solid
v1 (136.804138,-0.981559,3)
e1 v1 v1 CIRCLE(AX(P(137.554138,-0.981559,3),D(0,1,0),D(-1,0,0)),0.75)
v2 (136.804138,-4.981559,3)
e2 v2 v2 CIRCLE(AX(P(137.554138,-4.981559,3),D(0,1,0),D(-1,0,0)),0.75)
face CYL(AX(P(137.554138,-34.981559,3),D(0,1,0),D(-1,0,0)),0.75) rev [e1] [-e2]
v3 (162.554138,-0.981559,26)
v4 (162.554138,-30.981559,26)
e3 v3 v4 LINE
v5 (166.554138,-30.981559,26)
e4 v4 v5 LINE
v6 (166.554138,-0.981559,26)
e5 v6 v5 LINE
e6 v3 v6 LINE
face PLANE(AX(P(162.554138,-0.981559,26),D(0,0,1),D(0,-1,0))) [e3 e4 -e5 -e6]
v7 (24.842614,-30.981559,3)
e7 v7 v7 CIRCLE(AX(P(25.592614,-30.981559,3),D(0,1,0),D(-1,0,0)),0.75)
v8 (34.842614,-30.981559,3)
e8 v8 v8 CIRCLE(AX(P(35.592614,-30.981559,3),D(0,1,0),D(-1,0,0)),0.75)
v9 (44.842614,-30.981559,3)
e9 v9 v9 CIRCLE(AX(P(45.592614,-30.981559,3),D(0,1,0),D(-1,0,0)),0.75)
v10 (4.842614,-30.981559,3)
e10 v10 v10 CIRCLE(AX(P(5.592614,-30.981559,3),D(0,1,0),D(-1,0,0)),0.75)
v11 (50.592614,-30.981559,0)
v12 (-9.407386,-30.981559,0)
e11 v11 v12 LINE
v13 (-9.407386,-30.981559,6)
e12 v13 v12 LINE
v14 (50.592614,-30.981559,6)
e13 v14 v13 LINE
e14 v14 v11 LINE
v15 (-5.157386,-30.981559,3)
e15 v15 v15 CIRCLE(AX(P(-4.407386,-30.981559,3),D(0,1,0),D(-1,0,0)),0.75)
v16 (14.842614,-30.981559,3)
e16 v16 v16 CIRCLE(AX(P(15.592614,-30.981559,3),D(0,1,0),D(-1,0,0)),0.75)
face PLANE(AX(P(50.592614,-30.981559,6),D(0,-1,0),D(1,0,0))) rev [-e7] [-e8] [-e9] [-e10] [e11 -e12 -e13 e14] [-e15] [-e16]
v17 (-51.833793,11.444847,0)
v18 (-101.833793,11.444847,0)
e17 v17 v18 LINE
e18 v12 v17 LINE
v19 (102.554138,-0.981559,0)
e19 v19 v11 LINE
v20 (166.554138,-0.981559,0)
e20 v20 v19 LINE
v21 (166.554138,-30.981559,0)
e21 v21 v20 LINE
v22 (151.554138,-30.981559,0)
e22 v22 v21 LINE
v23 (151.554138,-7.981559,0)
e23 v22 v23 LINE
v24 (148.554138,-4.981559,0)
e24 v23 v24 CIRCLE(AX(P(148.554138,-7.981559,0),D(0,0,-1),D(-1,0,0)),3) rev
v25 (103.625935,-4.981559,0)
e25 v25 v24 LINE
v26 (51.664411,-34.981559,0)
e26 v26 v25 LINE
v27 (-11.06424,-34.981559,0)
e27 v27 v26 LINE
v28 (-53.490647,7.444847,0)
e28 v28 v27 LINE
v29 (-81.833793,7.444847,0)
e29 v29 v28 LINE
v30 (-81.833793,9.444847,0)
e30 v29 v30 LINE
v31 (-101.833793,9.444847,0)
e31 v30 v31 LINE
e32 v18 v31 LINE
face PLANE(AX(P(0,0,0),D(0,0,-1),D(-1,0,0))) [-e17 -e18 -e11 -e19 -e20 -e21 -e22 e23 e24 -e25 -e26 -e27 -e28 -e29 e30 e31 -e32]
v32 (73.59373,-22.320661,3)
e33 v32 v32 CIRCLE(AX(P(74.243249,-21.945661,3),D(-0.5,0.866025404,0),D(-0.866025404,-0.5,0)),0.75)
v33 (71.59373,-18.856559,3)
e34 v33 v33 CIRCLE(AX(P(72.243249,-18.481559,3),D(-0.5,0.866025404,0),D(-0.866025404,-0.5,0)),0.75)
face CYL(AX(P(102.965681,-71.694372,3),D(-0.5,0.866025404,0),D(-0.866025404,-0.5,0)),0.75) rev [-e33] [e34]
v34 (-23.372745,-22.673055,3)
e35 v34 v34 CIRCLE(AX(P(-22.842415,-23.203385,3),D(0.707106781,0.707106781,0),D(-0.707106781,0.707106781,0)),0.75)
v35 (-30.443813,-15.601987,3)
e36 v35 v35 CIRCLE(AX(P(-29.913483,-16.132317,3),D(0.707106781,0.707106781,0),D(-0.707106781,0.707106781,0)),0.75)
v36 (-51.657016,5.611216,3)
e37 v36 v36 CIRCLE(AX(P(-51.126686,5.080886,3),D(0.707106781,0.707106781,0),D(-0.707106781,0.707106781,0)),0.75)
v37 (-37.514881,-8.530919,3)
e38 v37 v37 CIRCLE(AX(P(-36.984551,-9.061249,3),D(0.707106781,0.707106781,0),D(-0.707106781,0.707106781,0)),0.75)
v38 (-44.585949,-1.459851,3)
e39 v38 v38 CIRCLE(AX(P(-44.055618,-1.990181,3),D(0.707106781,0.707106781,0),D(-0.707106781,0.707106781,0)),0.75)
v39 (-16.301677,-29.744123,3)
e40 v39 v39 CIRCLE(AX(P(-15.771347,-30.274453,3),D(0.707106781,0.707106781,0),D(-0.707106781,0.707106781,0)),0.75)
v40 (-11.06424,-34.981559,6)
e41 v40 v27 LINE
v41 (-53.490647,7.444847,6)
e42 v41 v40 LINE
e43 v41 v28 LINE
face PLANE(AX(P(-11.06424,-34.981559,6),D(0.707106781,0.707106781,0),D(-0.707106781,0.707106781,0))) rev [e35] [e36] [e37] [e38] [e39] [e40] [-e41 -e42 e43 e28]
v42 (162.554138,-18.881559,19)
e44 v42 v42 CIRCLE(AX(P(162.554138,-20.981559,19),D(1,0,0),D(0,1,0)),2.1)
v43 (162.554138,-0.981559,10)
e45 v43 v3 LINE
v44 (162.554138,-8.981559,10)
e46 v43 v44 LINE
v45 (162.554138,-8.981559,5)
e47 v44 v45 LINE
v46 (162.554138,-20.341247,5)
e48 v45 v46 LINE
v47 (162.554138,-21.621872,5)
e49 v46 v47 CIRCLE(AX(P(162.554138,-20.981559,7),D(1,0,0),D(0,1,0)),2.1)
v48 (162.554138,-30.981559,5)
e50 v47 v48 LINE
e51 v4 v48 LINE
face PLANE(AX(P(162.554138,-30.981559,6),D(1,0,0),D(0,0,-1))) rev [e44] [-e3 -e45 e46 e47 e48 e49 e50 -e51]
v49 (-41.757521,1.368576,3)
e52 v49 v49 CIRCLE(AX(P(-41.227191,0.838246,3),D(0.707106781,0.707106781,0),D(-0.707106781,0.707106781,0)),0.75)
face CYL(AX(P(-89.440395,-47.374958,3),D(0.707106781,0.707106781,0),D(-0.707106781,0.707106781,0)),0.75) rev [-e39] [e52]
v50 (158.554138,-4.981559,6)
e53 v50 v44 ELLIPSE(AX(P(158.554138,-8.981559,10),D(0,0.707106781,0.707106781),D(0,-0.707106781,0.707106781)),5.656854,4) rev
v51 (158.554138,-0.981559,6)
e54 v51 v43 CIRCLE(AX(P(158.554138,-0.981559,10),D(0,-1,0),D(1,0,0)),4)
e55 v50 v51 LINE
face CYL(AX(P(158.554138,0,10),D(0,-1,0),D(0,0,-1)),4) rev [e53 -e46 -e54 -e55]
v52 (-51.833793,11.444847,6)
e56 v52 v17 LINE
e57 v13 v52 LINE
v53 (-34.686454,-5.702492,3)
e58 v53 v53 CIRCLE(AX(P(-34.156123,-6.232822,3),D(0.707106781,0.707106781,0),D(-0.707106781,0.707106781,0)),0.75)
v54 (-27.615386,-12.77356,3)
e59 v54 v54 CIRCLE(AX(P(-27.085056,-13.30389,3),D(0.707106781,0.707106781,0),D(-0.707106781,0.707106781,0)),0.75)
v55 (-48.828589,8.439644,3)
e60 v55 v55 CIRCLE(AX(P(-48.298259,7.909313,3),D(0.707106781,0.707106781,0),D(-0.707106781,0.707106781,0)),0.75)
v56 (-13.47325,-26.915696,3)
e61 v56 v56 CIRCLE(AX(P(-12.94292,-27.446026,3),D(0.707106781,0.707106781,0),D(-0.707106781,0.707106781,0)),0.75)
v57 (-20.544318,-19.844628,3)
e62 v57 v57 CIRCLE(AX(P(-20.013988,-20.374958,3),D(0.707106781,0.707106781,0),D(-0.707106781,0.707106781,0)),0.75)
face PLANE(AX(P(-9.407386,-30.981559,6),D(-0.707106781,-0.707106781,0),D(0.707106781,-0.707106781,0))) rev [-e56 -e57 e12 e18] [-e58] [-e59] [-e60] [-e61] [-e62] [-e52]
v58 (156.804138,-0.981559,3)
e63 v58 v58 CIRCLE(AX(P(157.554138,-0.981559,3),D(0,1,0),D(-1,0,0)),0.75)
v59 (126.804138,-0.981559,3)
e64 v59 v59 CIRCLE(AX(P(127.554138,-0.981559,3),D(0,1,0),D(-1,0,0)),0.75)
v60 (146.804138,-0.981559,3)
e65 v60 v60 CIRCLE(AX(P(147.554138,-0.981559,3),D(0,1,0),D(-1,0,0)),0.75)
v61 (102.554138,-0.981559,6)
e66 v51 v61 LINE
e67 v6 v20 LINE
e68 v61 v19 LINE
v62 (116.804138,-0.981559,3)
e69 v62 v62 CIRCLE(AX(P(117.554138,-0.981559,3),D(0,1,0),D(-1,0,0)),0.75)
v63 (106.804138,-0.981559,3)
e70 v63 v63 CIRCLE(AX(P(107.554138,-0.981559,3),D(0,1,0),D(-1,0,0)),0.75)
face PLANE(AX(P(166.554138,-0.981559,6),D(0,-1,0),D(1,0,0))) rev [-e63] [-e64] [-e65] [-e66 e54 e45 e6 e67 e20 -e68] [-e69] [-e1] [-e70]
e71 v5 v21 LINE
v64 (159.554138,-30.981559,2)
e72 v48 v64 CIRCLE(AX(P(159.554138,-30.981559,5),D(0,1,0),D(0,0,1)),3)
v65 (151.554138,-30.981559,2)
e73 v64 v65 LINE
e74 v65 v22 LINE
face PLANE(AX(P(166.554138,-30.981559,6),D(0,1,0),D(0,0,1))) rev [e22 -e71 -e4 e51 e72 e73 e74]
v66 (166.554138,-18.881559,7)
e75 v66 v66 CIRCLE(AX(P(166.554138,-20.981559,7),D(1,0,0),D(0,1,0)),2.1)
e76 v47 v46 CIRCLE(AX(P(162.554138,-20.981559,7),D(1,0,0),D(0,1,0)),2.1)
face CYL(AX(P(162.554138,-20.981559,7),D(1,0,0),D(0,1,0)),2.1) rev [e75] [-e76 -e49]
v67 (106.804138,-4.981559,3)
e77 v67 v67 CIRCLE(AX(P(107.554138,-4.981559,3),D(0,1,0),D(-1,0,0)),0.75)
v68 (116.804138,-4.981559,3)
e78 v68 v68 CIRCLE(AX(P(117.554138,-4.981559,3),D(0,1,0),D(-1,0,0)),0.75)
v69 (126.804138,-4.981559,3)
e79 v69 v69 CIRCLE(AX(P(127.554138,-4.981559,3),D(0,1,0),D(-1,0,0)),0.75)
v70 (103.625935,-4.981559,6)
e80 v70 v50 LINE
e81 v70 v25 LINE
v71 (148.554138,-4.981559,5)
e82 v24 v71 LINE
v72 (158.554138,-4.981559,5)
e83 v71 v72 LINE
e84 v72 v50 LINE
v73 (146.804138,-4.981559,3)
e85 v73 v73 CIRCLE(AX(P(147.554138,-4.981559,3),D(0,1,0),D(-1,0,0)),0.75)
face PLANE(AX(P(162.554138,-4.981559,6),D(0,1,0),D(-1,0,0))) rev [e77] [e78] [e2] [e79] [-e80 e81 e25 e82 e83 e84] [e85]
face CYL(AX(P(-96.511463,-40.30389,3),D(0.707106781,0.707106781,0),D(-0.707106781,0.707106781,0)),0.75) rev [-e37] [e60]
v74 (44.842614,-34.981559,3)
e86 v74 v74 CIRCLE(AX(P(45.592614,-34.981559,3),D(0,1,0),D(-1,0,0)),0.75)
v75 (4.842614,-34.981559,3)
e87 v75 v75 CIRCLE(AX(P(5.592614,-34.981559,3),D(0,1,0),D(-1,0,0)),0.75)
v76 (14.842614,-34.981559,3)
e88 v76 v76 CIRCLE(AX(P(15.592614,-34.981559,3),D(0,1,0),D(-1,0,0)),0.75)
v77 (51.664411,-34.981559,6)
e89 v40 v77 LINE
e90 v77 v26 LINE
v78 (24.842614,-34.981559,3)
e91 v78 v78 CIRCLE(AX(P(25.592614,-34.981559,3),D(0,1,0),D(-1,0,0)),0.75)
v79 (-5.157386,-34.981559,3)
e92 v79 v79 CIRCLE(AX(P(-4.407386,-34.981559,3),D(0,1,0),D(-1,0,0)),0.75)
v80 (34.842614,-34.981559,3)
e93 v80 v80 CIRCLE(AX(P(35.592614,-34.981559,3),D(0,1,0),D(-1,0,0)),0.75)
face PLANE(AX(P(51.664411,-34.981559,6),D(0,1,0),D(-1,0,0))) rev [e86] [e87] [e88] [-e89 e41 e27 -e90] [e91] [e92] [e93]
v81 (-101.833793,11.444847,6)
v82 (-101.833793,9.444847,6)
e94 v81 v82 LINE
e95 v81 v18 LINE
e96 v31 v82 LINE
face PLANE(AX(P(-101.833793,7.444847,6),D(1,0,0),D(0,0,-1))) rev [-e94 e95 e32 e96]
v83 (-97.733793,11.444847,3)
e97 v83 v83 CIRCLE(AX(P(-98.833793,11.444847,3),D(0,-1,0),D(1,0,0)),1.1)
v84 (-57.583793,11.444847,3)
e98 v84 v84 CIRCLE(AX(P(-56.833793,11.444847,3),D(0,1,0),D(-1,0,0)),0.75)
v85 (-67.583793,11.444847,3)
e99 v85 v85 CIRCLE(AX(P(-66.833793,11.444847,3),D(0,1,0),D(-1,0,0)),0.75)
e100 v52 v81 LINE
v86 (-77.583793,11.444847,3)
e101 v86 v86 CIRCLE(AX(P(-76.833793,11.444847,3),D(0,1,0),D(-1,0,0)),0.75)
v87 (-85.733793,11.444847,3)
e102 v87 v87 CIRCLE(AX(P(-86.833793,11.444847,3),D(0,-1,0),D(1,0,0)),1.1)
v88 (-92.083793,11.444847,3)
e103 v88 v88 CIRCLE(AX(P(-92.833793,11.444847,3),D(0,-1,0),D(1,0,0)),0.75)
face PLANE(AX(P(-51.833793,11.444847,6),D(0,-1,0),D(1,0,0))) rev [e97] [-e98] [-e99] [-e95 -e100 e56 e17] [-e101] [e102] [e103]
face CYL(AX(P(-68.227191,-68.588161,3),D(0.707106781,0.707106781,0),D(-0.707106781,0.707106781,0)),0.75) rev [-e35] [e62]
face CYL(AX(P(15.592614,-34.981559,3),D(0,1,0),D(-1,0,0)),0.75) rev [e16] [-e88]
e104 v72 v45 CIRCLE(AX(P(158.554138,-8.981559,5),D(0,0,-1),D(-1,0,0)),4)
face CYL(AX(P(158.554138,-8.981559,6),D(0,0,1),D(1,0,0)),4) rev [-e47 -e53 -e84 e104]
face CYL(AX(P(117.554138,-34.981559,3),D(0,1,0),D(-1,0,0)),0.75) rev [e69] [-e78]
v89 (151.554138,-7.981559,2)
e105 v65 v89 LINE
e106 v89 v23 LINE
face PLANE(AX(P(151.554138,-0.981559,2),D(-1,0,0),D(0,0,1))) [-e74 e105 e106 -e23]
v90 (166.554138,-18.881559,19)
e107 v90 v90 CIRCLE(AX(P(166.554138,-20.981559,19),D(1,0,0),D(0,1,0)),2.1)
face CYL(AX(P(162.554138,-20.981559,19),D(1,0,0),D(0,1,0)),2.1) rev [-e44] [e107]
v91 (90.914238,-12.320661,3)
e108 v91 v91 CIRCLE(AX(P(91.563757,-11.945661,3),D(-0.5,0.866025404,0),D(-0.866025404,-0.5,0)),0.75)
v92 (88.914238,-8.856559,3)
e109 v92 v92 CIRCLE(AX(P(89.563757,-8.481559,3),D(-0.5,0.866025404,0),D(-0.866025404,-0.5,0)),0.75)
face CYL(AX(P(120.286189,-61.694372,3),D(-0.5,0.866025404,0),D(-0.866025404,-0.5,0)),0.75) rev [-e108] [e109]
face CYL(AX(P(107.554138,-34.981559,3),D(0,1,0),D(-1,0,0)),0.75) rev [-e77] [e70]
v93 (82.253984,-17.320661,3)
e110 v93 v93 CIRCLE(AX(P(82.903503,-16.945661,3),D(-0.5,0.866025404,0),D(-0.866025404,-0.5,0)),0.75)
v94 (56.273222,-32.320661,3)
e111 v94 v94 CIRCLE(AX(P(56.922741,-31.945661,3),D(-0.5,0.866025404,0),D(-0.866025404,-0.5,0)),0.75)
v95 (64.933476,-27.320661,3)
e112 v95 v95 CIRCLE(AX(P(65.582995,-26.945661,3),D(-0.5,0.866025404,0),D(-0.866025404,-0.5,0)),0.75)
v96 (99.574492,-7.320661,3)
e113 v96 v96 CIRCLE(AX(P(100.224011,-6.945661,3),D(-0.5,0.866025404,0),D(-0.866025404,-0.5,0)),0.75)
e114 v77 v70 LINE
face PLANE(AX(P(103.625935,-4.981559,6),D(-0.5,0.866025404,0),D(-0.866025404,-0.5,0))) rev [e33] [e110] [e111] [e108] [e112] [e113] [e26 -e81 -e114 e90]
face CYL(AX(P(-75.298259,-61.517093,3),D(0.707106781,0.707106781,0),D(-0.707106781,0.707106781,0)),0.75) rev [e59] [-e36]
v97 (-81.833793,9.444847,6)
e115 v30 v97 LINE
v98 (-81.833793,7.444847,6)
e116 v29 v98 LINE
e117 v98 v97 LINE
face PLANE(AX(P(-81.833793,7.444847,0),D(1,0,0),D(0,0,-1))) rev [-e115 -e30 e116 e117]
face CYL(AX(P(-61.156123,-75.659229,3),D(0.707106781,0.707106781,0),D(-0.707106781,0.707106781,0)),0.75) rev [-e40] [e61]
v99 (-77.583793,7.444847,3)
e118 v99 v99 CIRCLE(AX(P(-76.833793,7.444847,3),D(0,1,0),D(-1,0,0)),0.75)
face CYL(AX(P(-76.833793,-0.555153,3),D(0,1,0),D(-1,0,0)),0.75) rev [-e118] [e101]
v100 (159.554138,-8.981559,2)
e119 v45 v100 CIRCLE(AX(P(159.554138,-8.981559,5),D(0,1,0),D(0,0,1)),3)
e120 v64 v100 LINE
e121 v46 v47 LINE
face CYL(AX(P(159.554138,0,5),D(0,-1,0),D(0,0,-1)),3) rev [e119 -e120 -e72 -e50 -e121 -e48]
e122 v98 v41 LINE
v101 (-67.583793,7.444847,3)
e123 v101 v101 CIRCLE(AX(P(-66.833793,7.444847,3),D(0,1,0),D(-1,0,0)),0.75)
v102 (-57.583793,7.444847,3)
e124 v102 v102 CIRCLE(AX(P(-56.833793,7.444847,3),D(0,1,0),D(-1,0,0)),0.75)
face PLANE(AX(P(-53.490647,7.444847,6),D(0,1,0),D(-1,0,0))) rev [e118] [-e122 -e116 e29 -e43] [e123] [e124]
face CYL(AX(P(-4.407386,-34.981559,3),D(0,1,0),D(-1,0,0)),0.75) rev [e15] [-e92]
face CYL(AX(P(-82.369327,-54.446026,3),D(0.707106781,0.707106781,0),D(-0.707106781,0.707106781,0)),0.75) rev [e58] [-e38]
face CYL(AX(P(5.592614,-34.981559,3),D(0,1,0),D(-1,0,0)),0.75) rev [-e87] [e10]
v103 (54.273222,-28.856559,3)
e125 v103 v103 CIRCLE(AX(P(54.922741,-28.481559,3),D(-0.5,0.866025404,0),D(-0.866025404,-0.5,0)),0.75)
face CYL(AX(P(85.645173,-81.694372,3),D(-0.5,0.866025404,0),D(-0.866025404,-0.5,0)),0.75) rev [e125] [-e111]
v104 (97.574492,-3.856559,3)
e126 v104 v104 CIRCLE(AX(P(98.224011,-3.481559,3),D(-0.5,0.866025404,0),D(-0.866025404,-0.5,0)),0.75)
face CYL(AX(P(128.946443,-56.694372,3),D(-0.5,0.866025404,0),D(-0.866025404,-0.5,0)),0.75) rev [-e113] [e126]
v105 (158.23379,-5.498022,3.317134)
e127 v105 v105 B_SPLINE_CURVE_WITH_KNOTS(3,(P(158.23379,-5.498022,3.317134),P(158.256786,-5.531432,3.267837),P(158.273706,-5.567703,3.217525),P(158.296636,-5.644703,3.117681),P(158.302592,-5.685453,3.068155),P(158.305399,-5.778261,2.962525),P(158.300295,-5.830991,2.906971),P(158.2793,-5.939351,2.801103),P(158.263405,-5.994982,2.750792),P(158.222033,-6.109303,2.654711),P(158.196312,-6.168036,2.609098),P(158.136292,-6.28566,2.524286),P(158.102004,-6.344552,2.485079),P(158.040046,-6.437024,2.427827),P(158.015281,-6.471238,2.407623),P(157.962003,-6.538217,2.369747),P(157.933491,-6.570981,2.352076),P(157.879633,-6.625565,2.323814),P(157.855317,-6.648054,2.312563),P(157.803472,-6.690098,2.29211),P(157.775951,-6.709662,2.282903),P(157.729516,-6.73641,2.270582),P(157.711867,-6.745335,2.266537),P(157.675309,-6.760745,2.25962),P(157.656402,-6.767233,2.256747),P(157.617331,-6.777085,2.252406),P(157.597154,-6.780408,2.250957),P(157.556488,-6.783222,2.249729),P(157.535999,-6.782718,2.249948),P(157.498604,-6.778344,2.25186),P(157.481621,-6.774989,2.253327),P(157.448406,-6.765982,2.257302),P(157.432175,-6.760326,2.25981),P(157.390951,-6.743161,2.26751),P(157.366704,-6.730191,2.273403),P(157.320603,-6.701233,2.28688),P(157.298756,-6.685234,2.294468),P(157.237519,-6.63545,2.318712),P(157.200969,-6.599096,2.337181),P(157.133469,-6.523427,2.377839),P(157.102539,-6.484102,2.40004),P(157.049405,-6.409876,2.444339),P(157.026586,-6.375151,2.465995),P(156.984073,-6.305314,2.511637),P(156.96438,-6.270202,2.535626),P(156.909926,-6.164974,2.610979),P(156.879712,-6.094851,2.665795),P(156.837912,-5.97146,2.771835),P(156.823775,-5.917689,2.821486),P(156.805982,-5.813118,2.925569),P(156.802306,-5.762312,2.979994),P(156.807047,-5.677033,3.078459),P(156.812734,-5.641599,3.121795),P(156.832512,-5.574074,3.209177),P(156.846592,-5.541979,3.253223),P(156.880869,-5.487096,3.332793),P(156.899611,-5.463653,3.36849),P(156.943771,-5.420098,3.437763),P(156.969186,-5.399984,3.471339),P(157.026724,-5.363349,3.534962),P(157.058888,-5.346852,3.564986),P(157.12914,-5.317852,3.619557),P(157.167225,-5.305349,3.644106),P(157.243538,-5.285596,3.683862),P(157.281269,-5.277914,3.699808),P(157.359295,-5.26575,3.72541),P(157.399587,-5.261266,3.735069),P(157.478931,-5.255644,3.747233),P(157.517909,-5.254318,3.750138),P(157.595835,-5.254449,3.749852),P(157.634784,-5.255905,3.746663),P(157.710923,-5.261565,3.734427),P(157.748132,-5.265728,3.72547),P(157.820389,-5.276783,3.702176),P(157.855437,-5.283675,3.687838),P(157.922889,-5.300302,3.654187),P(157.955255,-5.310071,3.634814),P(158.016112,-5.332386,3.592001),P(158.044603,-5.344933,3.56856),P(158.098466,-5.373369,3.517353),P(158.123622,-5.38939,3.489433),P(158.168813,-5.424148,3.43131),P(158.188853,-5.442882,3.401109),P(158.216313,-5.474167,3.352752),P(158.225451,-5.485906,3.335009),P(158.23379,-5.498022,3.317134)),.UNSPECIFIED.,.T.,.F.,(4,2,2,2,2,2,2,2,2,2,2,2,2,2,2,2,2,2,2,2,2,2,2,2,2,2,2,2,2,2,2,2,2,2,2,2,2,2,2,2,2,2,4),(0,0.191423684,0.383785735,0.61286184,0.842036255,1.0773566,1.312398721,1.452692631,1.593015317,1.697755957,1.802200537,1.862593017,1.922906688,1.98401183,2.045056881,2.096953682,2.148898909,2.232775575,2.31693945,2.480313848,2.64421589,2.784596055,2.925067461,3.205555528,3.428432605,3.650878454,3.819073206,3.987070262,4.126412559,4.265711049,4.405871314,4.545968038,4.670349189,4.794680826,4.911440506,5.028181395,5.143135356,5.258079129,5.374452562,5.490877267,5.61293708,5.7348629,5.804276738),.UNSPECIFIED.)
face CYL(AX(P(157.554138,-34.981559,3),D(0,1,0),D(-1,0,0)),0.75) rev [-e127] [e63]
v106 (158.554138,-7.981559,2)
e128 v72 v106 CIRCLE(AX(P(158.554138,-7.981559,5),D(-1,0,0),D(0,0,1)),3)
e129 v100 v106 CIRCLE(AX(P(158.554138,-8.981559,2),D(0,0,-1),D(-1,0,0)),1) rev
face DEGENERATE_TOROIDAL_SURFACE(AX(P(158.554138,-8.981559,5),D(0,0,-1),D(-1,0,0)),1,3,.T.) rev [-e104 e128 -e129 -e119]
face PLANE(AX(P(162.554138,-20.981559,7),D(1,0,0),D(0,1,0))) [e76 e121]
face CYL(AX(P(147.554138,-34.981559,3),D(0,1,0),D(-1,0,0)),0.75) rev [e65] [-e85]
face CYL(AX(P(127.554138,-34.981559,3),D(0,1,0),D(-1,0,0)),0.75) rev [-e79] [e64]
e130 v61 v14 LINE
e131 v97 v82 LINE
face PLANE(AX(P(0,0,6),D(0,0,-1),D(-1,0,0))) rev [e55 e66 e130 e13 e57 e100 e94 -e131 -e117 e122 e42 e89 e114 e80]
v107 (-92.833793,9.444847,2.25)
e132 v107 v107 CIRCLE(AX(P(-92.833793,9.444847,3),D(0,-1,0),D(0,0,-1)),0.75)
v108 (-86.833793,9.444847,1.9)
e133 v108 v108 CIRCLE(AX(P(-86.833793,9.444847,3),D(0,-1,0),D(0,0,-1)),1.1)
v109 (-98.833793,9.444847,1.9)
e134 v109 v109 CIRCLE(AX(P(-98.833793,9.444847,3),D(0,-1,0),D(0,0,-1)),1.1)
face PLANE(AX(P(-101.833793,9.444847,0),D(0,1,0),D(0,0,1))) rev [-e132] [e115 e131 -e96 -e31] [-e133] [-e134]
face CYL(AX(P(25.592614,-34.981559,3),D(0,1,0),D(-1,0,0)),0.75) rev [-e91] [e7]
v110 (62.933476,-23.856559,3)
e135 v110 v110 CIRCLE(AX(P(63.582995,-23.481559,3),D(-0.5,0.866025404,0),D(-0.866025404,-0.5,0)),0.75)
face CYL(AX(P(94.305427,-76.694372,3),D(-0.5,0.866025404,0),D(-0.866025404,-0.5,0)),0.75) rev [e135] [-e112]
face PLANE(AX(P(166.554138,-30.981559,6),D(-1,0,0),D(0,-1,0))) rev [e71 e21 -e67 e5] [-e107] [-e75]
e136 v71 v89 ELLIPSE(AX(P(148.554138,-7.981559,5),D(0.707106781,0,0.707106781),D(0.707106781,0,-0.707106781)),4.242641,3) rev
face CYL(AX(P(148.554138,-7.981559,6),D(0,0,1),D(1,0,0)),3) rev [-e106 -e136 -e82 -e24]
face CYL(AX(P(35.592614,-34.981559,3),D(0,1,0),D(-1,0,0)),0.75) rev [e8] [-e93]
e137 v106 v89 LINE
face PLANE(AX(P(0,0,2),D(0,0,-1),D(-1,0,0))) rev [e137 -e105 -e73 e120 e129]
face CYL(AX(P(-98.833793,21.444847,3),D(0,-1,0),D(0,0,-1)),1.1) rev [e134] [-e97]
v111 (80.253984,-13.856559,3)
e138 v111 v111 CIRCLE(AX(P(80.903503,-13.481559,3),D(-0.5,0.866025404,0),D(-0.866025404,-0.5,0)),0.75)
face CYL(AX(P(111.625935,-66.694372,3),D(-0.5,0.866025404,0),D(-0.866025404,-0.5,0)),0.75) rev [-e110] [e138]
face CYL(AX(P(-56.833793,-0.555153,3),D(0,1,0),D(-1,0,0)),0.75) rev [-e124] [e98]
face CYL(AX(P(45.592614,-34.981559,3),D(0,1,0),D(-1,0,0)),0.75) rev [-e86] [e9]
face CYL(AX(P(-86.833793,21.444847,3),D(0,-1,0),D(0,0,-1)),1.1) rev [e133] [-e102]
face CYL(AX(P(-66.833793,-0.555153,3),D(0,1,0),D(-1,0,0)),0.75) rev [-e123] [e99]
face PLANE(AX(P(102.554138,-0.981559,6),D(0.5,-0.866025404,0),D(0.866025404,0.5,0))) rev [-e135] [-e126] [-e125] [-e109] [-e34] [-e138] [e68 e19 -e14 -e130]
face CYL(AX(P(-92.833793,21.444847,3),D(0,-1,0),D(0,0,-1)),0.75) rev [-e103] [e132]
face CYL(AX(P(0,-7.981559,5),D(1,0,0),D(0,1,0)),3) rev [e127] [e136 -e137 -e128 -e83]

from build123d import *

# Parameters (mm, degrees)
BOSS_EXTRUDE1_DEPTH = 6
SKETCH3_W           = 20
SKETCH3_H           = 2
CUT_EXTRUDE1_DEPTH  = 6
SKETCH4_R           = 0.75
CUT_EXTRUDE2_DEPTH  = 171.094917366
SKETCH5_R           = 0.75
CUT_EXTRUDE3_DEPTH  = 152.577812455
SKETCH6_R           = 0.75
CUT_EXTRUDE4_DEPTH  = 172.977559331
SKETCH7_R           = 0.75
CUT_EXTRUDE5_DEPTH  = 190.504855499
SKETCH9_R           = 0.75
CUT_EXTRUDE6_DEPTH  = 12
SKETCH10_R          = 1.1
CUT_EXTRUDE7_DEPTH  = 12
SKETCH11_R          = 1.1
CUT_EXTRUDE8_DEPTH  = 12
SKETCH12_R          = 0.75
CUT_EXTRUDE9_DEPTH  = 12
SKETCH15_W          = 20
SKETCH15_H          = 30
BOSS_EXTRUDE4_DEPTH = 4
FILLET4_R           = 4
SKETCH16_W          = 15
SKETCH16_H          = 30
BOSS_EXTRUDE5_DEPTH = 2
FILLET5_R           = 3
FILLET6_DEPTH       = 1.9999999
FILLET6_START       = 148.554137986
FILLET6_2_DEPTH     = 3.0000001
FILLET6_START_2     = 1.99999999
FILLET6_3_DEPTH     = 3.00000001
SKETCH17_R          = 2.1
CUT_EXTRUDE12_DEPTH = 4


with BuildPart() as part:
    # Sketch1 → Boss-Extrude1 (new body)
    with BuildSketch(Plane.XY):
        Polygon((166.554138086, -30.981559499), (166.554138086, -0.981559499), (102.554138086, -0.981559499), (50.592613859, -30.981559499), (-9.407386141, -30.981559499), (-51.833793012, 11.444847372), (-101.833793012, 11.444847372), (-101.833793012, 7.444847372), (-53.490647262, 7.444847372), (-11.06424039, -34.981559499), (51.664410629, -34.981559499), (103.625934856, -4.981559499), (162.554138086, -4.981559499), (162.554138086, -30.981559499), align=None)
    extrude(amount=BOSS_EXTRUDE1_DEPTH)

    # Sketch3 → Cut-Extrude1 (cut)
    with BuildSketch(Plane.XY.offset(6)):
        with Locations((-91.833793012, 8.444847372)):
            Rectangle(SKETCH3_W, SKETCH3_H)
    extrude(amount=-CUT_EXTRUDE1_DEPTH, mode=Mode.SUBTRACT)

    # Sketch4 → Cut-Extrude2 (cut, through all)
    with BuildSketch(Plane(origin=(0, -0.981559499, 0), x_dir=(1, 0, 0), z_dir=(0, 1, 0))):
        with Locations(Location((107.554138086, -3, 0), (0, 0, 180))):
            Circle(SKETCH4_R)
        with Locations(Location((117.554138086, -3, 0), (0, 0, 180))):
            Circle(SKETCH4_R)
        with Locations(Location((127.554138086, -3, 0), (0, 0, 180))):
            Circle(SKETCH4_R)
        with Locations(Location((137.554138086, -3, 0), (0, 0, 180))):
            Circle(SKETCH4_R)
        with Locations(Location((147.554138086, -3, 0), (0, 0, 180))):
            Circle(SKETCH4_R)
        with Locations(Location((157.554138086, -3, 0), (0, 0, 180))):
            Circle(SKETCH4_R)
    extrude(amount=-CUT_EXTRUDE2_DEPTH, mode=Mode.SUBTRACT)

    # Sketch5 → Cut-Extrude3 (cut, through all)
    with BuildSketch(Plane(origin=(26.063562252, -45.143414047, 0), x_dir=(0.8660254037844379, 0.5000000000000013, 0), z_dir=(-0.5000000000000013, 0.8660254037844379, 0))):
        with Locations(Location((33.323709096, -3, 0), (0, 0, 180))):
            Circle(SKETCH5_R)
        with Locations(Location((43.323709096, -3, 0), (0, 0, 180))):
            Circle(SKETCH5_R)
        with Locations(Location((53.323709096, -3, 0), (0, 0, 180))):
            Circle(SKETCH5_R)
        with Locations(Location((63.323709096, -3, 0), (0, 0, 180))):
            Circle(SKETCH5_R)
        with Locations(Location((73.323709096, -3, 0), (0, 0, 180))):
            Circle(SKETCH5_R)
        with Locations(Location((83.323709096, -3, 0), (0, 0, 180))):
            Circle(SKETCH5_R)
    extrude(amount=-CUT_EXTRUDE3_DEPTH, mode=Mode.SUBTRACT)

    # Sketch6 → Cut-Extrude4 (cut, through all)
    with BuildSketch(Plane(origin=(0, -30.981559499, 0), x_dir=(1, 0, 0), z_dir=(0, 1, 0))):
        with Locations(Location((45.592613859, -3, 0), (0, 0, 180))):
            Circle(SKETCH6_R)
        with Locations(Location((35.592613859, -3, 0), (0, 0, 180))):
            Circle(SKETCH6_R)
        with Locations(Location((25.592613859, -3, 0), (0, 0, 180))):
            Circle(SKETCH6_R)
        with Locations(Location((15.592613859, -3, 0), (0, 0, 180))):
            Circle(SKETCH6_R)
        with Locations(Location((5.592613859, -3, 0), (0, 0, 180))):
            Circle(SKETCH6_R)
        with Locations(Location((-4.407386141, -3, 0), (0, 0, 180))):
            Circle(SKETCH6_R)
    extrude(amount=-CUT_EXTRUDE4_DEPTH, mode=Mode.SUBTRACT)

    # Sketch7 → Cut-Extrude5 (cut, through all)
    with BuildSketch(Plane(origin=(-20.19447282, -20.19447282, 0), x_dir=(0, 0, -1), z_dir=(0.7071067811865487, 0.7071067811865464, 0))):
        with Locations(Location((-3, -10.25524428, 0), (0, 0, 90))):
            Circle(SKETCH7_R)
        with Locations(Location((-3, -0.25524428, 0), (0, 0, 90))):
            Circle(SKETCH7_R)
        with Locations(Location((-3, 9.74475572, 0), (0, 0, 90))):
            Circle(SKETCH7_R)
        with Locations(Location((-3, 19.74475572, 0), (0, 0, 90))):
            Circle(SKETCH7_R)
        with Locations(Location((-3, 29.74475572, 0), (0, 0, 90))):
            Circle(SKETCH7_R)
        with Locations(Location((-3, 39.74475572, 0), (0, 0, 90))):
            Circle(SKETCH7_R)
    extrude(amount=-CUT_EXTRUDE5_DEPTH, mode=Mode.SUBTRACT)

    # Sketch9 → Cut-Extrude6 (cut)
    with BuildSketch(Plane(origin=(0, 11.444847372, 0), x_dir=(1, 0, 0), z_dir=(0, 1, 0))):
        with Locations(Location((-56.833793012, -3, 0), (0, 0, 180))):
            Circle(SKETCH9_R)
        with Locations(Location((-66.833793012, -3, 0), (0, 0, 180))):
            Circle(SKETCH9_R)
        with Locations(Location((-76.833793012, -3, 0), (0, 0, 180))):
            Circle(SKETCH9_R)
    extrude(amount=-CUT_EXTRUDE6_DEPTH, mode=Mode.SUBTRACT)

    # Sketch10 → Cut-Extrude7 (cut)
    with BuildSketch(Plane.XZ.offset(-9.444847372)):
        with Locations(Location((-98.833793012, 3, 0), (0, 0, 270))):
            Circle(SKETCH10_R)
    extrude(amount=-CUT_EXTRUDE7_DEPTH, mode=Mode.SUBTRACT)

    # Sketch11 → Cut-Extrude8 (cut)
    with BuildSketch(Plane.XZ.offset(-9.444847372)):
        with Locations(Location((-86.833793012, 3, 0), (0, 0, 270))):
            Circle(SKETCH11_R)
    extrude(amount=-CUT_EXTRUDE8_DEPTH, mode=Mode.SUBTRACT)

    # Sketch12 → Cut-Extrude9 (cut)
    with BuildSketch(Plane.XZ.offset(-9.444847372)):
        with Locations(Location((-92.833793012, 3, 0), (0, 0, 270))):
            Circle(SKETCH12_R)
    extrude(amount=-CUT_EXTRUDE9_DEPTH, mode=Mode.SUBTRACT)

    # Sketch15 → Boss-Extrude4 (add)
    with BuildSketch(Plane(origin=(166.554138086, 0, 0), x_dir=(0, 0, -1), z_dir=(1, 0, 0))):
        with Locations((-16, -15.981559499)):
            Rectangle(SKETCH15_W, SKETCH15_H)
    extrude(amount=-BOSS_EXTRUDE4_DEPTH)

    # Fillet4
    fillet4_edges = [part.edges().sort_by_distance(p)[0] for p in [
        (162.554138086, -2.981559499, 6),
        (162.554138086, -4.981559499, 3),
    ]]
    fillet(fillet4_edges, radius=FILLET4_R)

    # Sketch16 → Boss-Extrude5 (add)
    with BuildSketch(Plane(origin=(0, 0, 0), x_dir=(-1, 0, 0), z_dir=(0, 0, -1))):
        with Locations((-159.054138086, -15.981559499)):
            Rectangle(SKETCH16_W, SKETCH16_H)
    extrude(amount=-BOSS_EXTRUDE5_DEPTH)

    # Fillet5
    # the kernel refuses this fillet: 3 mm, written as the material it adds along each edge
    with BuildSketch(Plane(origin=(158.554138086, -8.981559499, 2), x_dir=(1, 0, 0), z_dir=(0, -1, 0))) as fillet5_piece_1:
        with BuildLine():
            CenterArc((4 - FILLET5_R, FILLET5_R), FILLET5_R, 270, 90)
            Line((4, FILLET5_R), (4, 0))
            Line((4, 0), (4 - FILLET5_R, 0))
        make_face()
    revolve(axis=Axis((158.554138086, -8.981559499, 2), (0, 0, 1)), revolution_arc=90)
    with BuildSketch(Plane(origin=(151.554138086, -4.981559499, 2), x_dir=(0, -1, 0), z_dir=(1, 0, 0))) as fillet5_piece_2_section:
        with BuildLine():
            CenterArc((FILLET5_R, -FILLET5_R), FILLET5_R, 90, 90)
            Line((0, -FILLET5_R), (0, 0))
            Line((0, 0), (FILLET5_R, 0))
        make_face()
    fillet5_piece_2 = extrude(amount=7, mode=Mode.PRIVATE)
    fillet5_piece_2 = fillet5_piece_2 - Plane(origin=(157.554138086, -4.981559499, 3), x_dir=(-1, 0, 0), z_dir=(0, 1, 0)) * Cylinder(0.75, 27, mode=Mode.PRIVATE)
    add(fillet5_piece_2)
    with BuildSketch(Plane(origin=(162.554138086, -8.981559499, 2), x_dir=(0, 0, 1), z_dir=(0, -1, 0))) as fillet5_piece_3:
        with BuildLine():
            CenterArc((FILLET5_R, FILLET5_R), FILLET5_R, 180, 90)
            Line((0, FILLET5_R), (0, 0))
            Line((0, 0), (FILLET5_R, 0))
        make_face()
    extrude(amount=22)

    # Fillet6: read off the stored shape, not the designer's step
    # Fillet6 outline → Fillet6 (add)
    with BuildSketch(Plane.XY):
        with BuildLine():
            ThreePointArc((148.554138086, -4.981559499), (150.67545843, -5.860239155), (151.554138086, -7.981559499))
            Line((151.554138086, -7.981559499), (151.554138086, -4.981559499))
            Line((151.554138086, -4.981559499), (148.554138086, -4.981559499))
        make_face()
    extrude(amount=FILLET6_DEPTH)

    # Fillet6 2 outline → Fillet6 2 (add)
    with BuildSketch(Plane.YZ.offset(FILLET6_START)):
        with BuildLine():
            ThreePointArc((-4.981559499, 5), (-5.860239155, 2.878679656), (-7.981559499, 2))
            Line((-7.981559499, 2), (-4.981559499, 1.9999999))
            Line((-4.981559499, 1.9999999), (-4.981559499, 5))
        make_face()
    extrude(amount=FILLET6_2_DEPTH)

    # Fillet6 3 outline → Fillet6 3 (cut)
    with BuildSketch(Plane.XY.offset(FILLET6_START_2)):
        with BuildLine():
            Line((151.554138085, -9), (151.554138086, -7.981559499))
            ThreePointArc((151.554138086, -7.981559499), (150.67545843, -5.860239155), (148.554138086, -4.981559499))
            Line((148.554138086, -4.981559499), (148.554137986, -9))
            Line((148.554137986, -9), (151.554138085, -9))
        make_face()
    extrude(amount=FILLET6_3_DEPTH, mode=Mode.SUBTRACT)

    # Sketch17 → Cut-Extrude12 (cut)
    with BuildSketch(Plane(origin=(166.554138086, 0, 0), x_dir=(0, 0, -1), z_dir=(1, 0, 0))):
        with Locations(Location((-19, -20.981559499, 0), (0, 0, 90))):
            Circle(SKETCH17_R)
        with Locations(Location((-7, -20.981559499, 0), (0, 0, 90))):
            Circle(SKETCH17_R)
    extrude(amount=-CUT_EXTRUDE12_DEPTH, mode=Mode.SUBTRACT)


solid = part.part
